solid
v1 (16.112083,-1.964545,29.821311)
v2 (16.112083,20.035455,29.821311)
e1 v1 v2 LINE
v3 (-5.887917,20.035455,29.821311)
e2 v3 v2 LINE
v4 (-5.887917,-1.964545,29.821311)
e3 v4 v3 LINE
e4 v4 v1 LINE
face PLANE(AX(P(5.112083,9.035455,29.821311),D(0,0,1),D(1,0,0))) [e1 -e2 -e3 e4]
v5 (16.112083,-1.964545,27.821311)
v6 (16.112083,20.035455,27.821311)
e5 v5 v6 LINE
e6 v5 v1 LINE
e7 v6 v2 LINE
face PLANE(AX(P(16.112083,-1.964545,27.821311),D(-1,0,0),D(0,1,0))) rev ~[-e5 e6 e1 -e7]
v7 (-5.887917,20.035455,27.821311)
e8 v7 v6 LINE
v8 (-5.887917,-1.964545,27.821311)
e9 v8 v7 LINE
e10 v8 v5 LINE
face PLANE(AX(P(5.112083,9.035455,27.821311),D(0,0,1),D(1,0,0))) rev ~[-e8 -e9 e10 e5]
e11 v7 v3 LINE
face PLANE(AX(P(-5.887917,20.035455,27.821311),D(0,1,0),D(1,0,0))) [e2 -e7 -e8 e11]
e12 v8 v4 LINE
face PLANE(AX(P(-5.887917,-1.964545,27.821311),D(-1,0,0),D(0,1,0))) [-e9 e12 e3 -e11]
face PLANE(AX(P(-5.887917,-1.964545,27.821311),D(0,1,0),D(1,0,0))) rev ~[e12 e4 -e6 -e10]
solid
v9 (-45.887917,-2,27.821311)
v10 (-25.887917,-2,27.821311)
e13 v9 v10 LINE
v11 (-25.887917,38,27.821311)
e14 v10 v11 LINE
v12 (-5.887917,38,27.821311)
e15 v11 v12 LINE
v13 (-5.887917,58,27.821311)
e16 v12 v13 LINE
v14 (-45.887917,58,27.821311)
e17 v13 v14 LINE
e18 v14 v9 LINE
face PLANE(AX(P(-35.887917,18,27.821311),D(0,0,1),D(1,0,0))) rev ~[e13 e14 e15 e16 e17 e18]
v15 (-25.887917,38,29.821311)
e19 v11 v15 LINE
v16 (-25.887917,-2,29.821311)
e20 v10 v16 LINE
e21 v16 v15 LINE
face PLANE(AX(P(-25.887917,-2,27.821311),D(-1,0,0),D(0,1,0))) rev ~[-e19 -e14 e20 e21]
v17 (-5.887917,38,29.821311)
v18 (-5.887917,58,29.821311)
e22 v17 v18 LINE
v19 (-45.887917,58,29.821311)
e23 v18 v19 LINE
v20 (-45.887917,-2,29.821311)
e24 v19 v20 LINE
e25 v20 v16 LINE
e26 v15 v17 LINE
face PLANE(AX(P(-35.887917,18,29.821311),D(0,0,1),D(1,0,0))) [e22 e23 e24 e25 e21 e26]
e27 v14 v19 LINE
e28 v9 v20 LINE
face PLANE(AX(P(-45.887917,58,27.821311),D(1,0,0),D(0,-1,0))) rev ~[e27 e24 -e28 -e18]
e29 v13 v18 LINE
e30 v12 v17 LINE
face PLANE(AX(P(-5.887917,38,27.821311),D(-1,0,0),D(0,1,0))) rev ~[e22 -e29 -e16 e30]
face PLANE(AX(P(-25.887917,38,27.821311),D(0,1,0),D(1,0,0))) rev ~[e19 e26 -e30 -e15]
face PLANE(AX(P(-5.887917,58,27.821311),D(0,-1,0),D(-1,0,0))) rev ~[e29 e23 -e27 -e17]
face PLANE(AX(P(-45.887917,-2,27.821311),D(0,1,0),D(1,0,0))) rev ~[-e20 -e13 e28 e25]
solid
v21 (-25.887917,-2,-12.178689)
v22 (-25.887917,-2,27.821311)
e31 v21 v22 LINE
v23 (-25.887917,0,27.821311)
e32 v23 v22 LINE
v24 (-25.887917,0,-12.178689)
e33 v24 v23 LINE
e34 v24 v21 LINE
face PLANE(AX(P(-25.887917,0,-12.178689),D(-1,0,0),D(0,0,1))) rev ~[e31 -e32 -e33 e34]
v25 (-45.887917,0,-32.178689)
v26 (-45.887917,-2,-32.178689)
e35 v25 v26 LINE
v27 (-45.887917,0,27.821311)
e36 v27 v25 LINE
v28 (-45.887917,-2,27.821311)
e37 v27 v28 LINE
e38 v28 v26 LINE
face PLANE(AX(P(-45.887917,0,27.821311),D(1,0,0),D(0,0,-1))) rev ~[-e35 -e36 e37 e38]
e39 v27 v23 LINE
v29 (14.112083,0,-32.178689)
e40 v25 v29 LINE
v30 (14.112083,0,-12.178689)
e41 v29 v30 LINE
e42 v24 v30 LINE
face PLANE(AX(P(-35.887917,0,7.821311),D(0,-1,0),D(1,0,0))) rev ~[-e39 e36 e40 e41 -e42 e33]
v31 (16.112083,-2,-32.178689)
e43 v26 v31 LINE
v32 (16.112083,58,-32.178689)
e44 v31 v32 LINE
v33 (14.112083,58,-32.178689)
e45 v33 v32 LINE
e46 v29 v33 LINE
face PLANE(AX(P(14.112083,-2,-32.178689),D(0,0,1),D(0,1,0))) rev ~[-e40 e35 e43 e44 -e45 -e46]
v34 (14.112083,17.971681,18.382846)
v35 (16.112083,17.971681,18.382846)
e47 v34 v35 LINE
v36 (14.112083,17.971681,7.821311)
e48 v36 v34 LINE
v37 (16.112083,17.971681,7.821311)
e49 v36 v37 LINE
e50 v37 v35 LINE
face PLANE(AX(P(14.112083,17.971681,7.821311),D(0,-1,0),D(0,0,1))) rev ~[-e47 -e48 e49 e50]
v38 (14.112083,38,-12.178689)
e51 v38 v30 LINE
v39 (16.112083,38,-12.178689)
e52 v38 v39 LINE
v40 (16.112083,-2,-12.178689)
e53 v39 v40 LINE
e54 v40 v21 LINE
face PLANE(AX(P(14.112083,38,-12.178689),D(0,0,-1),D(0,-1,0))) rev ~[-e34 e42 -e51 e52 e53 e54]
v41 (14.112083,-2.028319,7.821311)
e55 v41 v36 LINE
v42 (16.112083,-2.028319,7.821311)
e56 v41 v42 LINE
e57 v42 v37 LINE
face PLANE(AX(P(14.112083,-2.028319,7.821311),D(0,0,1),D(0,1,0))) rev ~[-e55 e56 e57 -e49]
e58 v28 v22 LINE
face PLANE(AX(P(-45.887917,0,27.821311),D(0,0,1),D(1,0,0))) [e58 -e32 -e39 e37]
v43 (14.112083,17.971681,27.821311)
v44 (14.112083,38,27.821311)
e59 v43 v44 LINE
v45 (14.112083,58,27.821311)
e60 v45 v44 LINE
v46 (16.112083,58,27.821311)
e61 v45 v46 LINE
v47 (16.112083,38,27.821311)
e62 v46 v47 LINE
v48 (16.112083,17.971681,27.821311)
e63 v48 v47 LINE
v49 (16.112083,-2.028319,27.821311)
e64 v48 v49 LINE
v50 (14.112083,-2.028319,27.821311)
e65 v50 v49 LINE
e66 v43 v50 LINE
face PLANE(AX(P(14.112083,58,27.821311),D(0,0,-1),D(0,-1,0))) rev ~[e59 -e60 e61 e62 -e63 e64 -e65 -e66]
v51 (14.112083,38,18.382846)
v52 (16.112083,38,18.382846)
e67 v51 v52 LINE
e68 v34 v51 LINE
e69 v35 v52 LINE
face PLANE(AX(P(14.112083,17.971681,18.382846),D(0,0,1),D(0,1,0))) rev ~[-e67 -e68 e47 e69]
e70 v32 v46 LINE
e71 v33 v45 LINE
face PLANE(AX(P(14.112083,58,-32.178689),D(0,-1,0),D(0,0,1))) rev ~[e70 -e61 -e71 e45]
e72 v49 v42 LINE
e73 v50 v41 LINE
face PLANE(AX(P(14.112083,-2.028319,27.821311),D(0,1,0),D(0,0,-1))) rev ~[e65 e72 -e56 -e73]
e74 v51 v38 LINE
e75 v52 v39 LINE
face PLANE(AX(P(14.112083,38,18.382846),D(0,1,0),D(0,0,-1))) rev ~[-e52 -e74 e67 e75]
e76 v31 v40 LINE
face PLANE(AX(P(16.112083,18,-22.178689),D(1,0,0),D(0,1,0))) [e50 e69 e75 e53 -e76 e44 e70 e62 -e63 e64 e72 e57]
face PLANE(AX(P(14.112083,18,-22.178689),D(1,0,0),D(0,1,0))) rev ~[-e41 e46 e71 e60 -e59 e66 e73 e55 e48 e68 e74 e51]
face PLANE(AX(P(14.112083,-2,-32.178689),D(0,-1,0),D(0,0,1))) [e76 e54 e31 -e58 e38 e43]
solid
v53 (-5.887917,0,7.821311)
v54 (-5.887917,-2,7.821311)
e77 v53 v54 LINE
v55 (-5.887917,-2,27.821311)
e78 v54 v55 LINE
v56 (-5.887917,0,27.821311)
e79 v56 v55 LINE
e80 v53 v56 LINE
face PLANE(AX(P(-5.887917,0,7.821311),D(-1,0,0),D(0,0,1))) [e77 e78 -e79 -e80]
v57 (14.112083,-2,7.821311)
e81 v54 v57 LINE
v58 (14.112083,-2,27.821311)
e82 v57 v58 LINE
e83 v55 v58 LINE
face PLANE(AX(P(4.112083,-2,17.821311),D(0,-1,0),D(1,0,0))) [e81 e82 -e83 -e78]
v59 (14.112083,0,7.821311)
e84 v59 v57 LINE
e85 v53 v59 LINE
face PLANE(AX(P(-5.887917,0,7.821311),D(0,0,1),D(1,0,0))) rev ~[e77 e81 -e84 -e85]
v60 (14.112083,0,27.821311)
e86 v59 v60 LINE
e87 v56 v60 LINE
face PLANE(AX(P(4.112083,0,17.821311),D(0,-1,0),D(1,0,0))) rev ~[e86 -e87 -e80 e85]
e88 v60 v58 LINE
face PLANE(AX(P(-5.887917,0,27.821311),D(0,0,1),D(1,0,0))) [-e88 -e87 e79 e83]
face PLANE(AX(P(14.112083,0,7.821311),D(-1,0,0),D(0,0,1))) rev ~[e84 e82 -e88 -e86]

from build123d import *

# Parameters (mm, degrees)
F0_W     = 20
F0_H     = 40
F0_H_2   = 20
F0_W_2   = 40
F1_DEPTH = 2
F2_W     = 40
F2_H     = 20
F2_W_2   = 20
F2_W_3   = 20.0283188205
F2_H_2   = 9.4384654047
F3_DEPTH = 2
F4_W     = 20
F4_H     = 40
F4_H_2   = 20
F5_DEPTH = 2
F4_W_2   = 22
F4_H_3   = 22


with BuildPart() as f1:
    # F0 (on Front) → F1 (new body)
    with BuildSketch(Plane.XZ):
        with Locations((-35.8879165724, 7.8213110747)):
            Rectangle(F0_W, F0_H)
        with Locations((-35.8879165724, -22.1786889253)):
            Rectangle(F0_W, F0_H_2)
        with Locations((-5.8879165724, -22.1786889253)):
            Rectangle(F0_W_2, F0_H_2)
    extrude(amount=F1_DEPTH)

    # F2 (on face) → F3 (join)
    with BuildSketch(Plane.YZ.offset(14.1120834276)):
        with Locations((18, -22.1786889253)):
            Rectangle(F2_W, F2_H)
        with Locations((48, -22.1786889253)):
            Rectangle(F2_W_2, F2_H)
        Polygon((38, 18.38284567), (38, -12.1786889253), (58, -12.1786889253), (58, 27.8213110747), (38, 27.8213110747), align=None)
        with Locations((27.9858405897, 23.1020783723)):
            Rectangle(F2_W_3, F2_H_2)
        Polygon((17.9716811795, 7.8213110747), (17.9716811795, 18.38284567), (17.9716811795, 27.8213110747), (-2.0283188205, 27.8213110747), (-2.0283188205, 7.8213110747), align=None)
    extrude(amount=F3_DEPTH)


with BuildPart() as f1b:
    # F0 (on Front) → F1, piece 2 (new body)
    with BuildSketch(Plane.XZ):
        with Locations((4.1120834276, 17.8213110747)):
            Rectangle(F0_W, F0_H_2)
    extrude(amount=F1_DEPTH)


with BuildPart() as f5:
    # F4 (on face) → F5 (new body)
    with BuildSketch(Plane.XY.offset(27.8213110747)):
        with Locations((-35.8879165724, 18)):
            Rectangle(F4_W, F4_H)
        with Locations((-35.8879165724, 48)):
            Rectangle(F4_W, F4_H_2)
        with Locations((-15.8879165724, 48)):
            Rectangle(F4_W, F4_H_2)
    extrude(amount=F5_DEPTH)


with BuildPart() as f5b:
    # F4 (on face) → F5, piece 2 (new body)
    with BuildSketch(Plane.XY.offset(27.8213110747)):
        with Locations((5.1120834276, 9.0354546569)):
            Rectangle(F4_W_2, F4_H_3)
    extrude(amount=F5_DEPTH)


solid = Compound([f1.part, f1b.part, f5.part, f5b.part])
